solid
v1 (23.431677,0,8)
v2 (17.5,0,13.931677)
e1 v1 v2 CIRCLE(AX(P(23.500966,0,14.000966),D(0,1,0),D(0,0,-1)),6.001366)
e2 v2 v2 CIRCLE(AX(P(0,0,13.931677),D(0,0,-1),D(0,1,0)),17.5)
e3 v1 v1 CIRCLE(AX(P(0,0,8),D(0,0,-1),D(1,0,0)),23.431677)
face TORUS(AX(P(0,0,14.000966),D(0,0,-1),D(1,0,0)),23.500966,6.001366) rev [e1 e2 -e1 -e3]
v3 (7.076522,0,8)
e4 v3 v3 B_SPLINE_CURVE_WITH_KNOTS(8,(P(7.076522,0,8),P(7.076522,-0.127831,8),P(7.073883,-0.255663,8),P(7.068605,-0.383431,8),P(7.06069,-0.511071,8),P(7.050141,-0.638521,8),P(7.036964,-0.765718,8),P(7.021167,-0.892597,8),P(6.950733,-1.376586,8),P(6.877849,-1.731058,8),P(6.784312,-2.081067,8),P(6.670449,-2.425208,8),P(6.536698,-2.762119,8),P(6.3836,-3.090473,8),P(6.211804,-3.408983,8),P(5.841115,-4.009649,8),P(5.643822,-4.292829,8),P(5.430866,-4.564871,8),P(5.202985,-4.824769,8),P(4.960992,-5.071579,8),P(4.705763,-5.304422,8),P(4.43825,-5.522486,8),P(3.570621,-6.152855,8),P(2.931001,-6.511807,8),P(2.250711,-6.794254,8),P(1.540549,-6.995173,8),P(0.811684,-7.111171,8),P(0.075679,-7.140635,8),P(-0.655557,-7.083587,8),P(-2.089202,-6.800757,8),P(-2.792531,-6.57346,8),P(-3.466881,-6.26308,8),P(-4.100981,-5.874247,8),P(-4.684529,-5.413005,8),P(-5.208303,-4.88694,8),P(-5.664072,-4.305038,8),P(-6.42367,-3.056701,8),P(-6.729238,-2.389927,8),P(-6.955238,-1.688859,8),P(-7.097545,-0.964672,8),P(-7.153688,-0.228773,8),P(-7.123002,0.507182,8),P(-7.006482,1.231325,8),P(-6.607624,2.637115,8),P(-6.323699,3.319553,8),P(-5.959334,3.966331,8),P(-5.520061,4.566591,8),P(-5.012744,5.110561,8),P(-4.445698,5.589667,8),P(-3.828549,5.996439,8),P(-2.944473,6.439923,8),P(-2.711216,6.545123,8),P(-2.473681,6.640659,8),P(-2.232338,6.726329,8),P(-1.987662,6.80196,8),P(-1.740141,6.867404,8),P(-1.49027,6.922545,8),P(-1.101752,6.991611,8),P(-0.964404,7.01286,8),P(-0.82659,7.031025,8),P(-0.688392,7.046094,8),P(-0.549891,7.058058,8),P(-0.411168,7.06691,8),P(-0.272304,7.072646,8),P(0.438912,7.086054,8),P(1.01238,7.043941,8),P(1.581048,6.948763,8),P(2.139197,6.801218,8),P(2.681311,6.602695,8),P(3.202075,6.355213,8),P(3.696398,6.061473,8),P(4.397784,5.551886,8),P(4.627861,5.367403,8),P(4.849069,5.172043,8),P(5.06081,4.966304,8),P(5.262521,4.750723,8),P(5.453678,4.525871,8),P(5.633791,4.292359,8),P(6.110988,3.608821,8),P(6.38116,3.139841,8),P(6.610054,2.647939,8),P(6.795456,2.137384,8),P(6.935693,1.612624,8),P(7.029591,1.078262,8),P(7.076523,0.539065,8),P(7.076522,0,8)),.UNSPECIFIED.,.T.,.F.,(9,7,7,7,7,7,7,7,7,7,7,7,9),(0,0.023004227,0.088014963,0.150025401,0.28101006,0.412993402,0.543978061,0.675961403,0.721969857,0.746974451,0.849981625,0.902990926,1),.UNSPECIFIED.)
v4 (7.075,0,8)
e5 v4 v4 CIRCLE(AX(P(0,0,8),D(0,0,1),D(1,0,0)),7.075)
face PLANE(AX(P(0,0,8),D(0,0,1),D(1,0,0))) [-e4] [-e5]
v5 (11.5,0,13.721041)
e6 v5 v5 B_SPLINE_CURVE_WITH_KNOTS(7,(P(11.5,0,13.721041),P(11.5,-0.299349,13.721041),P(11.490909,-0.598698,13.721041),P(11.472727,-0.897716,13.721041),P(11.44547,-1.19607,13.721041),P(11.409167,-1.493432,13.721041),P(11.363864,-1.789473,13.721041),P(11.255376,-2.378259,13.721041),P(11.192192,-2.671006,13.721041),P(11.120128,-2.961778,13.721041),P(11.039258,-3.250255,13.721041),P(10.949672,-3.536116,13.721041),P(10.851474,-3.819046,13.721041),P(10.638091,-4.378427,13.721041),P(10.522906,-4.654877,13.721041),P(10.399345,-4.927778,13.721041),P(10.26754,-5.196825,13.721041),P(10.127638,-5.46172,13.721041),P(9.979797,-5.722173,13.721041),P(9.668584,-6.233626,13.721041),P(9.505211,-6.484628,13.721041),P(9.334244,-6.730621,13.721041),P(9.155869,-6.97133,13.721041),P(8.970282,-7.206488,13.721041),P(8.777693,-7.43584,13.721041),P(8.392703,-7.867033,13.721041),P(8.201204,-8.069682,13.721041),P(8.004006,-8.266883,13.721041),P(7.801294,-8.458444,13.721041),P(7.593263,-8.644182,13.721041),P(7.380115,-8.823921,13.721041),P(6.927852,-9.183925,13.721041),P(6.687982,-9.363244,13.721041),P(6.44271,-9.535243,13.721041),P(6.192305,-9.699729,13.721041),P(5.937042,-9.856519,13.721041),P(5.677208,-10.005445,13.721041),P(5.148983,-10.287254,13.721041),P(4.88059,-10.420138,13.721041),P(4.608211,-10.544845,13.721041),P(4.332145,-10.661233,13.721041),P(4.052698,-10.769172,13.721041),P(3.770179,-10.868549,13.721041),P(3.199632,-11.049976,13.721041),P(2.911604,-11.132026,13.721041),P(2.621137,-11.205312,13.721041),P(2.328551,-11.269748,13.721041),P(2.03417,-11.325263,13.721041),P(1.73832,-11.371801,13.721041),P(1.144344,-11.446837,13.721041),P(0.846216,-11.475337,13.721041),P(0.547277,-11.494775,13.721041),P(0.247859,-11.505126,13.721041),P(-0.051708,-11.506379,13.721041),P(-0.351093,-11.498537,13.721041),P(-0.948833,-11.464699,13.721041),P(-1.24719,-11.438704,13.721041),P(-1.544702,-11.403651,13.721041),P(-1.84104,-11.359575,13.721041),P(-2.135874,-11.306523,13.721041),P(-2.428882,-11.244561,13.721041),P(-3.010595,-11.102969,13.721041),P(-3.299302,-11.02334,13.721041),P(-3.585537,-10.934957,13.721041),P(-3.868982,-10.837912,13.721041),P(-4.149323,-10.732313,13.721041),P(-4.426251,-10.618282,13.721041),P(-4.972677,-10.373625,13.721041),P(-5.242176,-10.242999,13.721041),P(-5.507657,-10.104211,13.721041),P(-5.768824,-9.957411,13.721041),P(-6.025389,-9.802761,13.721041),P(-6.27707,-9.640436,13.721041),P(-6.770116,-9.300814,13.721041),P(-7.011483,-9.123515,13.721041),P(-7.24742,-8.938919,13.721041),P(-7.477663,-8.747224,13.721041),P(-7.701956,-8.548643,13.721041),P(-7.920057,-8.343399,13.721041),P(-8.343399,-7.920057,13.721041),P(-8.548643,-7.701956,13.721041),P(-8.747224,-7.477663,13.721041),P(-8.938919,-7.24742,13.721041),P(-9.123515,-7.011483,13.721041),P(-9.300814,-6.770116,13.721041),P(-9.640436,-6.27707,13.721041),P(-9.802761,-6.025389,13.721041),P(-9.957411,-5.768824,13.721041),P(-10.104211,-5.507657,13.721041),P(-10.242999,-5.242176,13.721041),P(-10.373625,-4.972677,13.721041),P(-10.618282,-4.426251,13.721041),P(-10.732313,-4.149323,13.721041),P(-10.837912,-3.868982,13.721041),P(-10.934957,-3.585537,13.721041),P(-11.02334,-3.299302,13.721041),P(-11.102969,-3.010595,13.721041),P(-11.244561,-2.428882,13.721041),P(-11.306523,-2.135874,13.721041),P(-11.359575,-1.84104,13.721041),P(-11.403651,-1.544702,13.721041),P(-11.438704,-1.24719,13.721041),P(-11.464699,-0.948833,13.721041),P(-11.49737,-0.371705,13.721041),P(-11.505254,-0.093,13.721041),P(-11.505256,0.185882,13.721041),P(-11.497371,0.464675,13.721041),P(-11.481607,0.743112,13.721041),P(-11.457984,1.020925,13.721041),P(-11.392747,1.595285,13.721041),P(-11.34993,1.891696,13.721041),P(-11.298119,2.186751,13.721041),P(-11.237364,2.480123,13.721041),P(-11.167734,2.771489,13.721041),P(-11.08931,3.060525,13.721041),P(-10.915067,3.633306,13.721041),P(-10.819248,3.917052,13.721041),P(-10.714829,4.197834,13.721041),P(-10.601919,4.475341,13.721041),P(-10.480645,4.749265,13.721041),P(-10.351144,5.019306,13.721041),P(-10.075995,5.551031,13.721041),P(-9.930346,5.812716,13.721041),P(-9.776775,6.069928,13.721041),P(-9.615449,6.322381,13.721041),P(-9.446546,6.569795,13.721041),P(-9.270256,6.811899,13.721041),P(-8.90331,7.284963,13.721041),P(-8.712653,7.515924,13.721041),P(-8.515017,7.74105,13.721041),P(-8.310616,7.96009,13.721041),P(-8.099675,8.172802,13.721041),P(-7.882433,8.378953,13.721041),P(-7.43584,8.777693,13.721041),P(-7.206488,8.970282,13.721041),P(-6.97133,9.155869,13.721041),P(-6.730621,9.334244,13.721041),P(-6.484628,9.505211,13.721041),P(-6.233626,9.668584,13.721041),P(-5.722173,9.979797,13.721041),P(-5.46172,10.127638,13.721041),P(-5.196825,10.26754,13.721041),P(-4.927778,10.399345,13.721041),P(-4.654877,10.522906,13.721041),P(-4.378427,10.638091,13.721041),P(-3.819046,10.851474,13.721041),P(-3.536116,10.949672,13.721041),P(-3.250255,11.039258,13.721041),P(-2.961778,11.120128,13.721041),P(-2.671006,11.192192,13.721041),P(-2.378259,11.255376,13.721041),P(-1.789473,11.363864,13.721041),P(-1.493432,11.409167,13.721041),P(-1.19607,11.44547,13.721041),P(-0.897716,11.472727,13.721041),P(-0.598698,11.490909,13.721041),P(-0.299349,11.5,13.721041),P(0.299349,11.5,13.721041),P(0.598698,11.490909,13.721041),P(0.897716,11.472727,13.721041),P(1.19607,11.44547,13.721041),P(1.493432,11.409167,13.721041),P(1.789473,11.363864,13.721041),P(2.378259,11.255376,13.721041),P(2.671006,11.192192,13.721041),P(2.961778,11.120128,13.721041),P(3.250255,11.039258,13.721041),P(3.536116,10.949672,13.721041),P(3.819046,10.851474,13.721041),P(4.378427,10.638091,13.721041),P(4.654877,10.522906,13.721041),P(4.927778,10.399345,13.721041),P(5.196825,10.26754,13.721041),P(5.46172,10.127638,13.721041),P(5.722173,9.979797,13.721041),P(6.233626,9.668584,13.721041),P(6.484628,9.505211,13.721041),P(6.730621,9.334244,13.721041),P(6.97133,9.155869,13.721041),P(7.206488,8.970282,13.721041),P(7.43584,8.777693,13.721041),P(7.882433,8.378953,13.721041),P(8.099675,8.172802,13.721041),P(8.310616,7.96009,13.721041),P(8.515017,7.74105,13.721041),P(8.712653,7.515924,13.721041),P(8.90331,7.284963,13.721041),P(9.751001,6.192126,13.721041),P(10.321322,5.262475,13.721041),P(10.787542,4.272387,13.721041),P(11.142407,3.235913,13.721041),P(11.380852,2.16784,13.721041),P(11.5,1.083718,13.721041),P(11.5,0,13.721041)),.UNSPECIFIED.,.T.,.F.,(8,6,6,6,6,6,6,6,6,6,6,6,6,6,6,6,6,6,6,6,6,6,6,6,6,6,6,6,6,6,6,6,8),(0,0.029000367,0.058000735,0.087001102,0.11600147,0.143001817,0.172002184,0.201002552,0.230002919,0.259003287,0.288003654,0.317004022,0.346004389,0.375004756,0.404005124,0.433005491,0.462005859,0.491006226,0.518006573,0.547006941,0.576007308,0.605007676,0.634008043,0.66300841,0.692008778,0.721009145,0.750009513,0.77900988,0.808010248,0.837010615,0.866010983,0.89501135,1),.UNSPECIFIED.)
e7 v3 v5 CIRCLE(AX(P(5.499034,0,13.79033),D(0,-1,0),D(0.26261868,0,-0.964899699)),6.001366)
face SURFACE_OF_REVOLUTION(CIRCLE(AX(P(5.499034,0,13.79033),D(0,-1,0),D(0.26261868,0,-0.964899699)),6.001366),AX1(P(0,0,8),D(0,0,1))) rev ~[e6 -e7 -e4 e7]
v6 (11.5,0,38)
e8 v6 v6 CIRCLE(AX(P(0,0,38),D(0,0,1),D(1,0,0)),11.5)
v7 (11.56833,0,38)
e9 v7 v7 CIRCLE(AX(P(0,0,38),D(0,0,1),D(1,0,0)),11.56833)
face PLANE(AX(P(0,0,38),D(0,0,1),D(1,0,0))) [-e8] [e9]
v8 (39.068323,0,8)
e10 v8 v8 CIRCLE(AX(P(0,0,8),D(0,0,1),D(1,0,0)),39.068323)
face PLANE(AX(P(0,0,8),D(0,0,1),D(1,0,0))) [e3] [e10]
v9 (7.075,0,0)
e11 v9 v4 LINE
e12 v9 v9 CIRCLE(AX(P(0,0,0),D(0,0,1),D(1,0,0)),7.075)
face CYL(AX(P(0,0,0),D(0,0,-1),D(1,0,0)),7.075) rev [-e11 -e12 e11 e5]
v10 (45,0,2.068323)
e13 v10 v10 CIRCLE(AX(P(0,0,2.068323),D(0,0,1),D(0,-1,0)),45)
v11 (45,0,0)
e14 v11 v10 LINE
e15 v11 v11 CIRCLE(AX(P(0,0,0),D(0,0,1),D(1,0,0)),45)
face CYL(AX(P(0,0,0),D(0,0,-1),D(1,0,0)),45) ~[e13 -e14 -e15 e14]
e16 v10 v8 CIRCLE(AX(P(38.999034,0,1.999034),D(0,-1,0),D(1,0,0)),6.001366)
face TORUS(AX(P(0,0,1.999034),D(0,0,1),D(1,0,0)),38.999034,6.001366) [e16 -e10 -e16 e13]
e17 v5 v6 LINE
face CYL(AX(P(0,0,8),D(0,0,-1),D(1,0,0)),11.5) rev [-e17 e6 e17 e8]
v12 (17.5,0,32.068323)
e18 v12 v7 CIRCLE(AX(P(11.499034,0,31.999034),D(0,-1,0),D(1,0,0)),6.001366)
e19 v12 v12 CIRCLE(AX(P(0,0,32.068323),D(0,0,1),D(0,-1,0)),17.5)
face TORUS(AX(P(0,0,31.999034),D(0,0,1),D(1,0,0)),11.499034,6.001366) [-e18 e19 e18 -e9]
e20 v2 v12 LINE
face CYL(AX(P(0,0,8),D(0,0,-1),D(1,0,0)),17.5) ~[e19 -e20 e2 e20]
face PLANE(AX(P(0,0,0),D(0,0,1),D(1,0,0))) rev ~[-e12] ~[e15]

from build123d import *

# Parameters (mm, degrees)
F0_R     = 45
F0_R_2   = 7.075
F1_DEPTH = 8
F2_R     = 17.5
F2_R_2   = 11.5
F3_DEPTH = 30


# Not quite as in the source:
# - a fillet or chamfer that OpenCascade refuses, or shapes differently, is made with other operations: its cross-section is extruded or revolved along the edge and cut away or added


with BuildPart() as f1:
    # F0 (on Top) → F1 (new body)
    with BuildSketch(Plane.XY):
        Circle(F0_R)
        Circle(F0_R_2, mode=Mode.SUBTRACT)
    extrude(amount=F1_DEPTH)

    # F2 (on face) → F3 (join)
    with BuildSketch(Plane.XY.offset(8)):
        Circle(F2_R)
        Circle(F2_R_2, mode=Mode.SUBTRACT)
    extrude(amount=F3_DEPTH)

    # F4: fillet of radius 6 on 4 edges, made by hand

    # F4_s1 → F4_t2 (revolve)
    with BuildSketch(Plane.XZ):
        with BuildLine():
            ThreePointArc((23.5009656854, 7.9996), (19.2573593129, 9.7573593129), (17.4996, 14.0009656854))
            Line((17.4996, 14.0009656854), (16.8994634315, 14.0009656854))
            ThreePointArc((16.8994634315, 14.0009656854), (16.8998634315, 11.0004828427), (16.8998634315, 8))
            Line((16.8998634315, 8), (17.5, 7.3998634315))
            ThreePointArc((17.5, 7.3998634315), (20.5004828427, 7.3998634315), (23.5009656854, 7.3994634315))
            Line((23.5009656854, 7.3994634315), (23.5009656854, 7.9996))
        make_face()
    revolve(axis=Axis((0, 0, 8), (0, 0, 1)))

    # F4_s3 → F4_t4 (revolve)
    with BuildSketch(Plane.XZ):
        with BuildLine():
            ThreePointArc((7.0751050475, 7.9996140401), (10.2674180504, 10.1463065699), (11.5004, 13.7903299833))
            Line((11.5004, 13.7903299833), (12.1005365685, 13.7903299833))
            ThreePointArc((12.1005365685, 13.7903299833), (12.1001365685, 10.8951649917), (12.1001365685, 8))
            Line((12.1001365685, 8), (11.5, 7.3998634315))
            ThreePointArc((11.5, 7.3998634315), (9.2875525237, 7.3998634315), (7.2327121208, 7.4205424458))
            Line((7.2327121208, 7.4205424458), (7.0751050475, 7.9996140401))
        make_face()
    revolve(axis=Axis((0, 0, 8), (0, 0, 1)))

    # F4_s5 → F4_t6 (revolve, cut)
    with BuildSketch(Plane.XZ):
        with BuildLine():
            ThreePointArc((45.0004, 1.9990343146), (43.2426406871, 6.2426406871), (38.9990343146, 8.0004))
            Line((38.9990343146, 8.0004), (38.9990343146, 8.6005365685))
            ThreePointArc((38.9990343146, 8.6005365685), (41.9995171573, 8.6001365685), (45, 8.6001365685))
            Line((45, 8.6001365685), (45.6001365685, 8))
            ThreePointArc((45.6001365685, 8), (45.6001365685, 4.9995171573), (45.6005365685, 1.9990343146))
            Line((45.6005365685, 1.9990343146), (45.0004, 1.9990343146))
        make_face()
    revolve(axis=Axis((0, 0, 8), (0, 0, 1)), mode=Mode.SUBTRACT)

    # F4_s7 → F4_t8 (revolve, cut)
    with BuildSketch(Plane.XZ):
        with BuildLine():
            ThreePointArc((17.5004, 31.9990343923), (15.7429821175, 36.242299307), (11.5000000644, 38.0004))
            Line((11.5000000644, 38.0004), (11.5000966393, 38.6005365608))
            ThreePointArc((11.5000966393, 38.6005365608), (14.5000000322, 38.6001365685), (17.5, 38.6001365685))
            Line((17.5, 38.6001365685), (18.1001365685, 38))
            ThreePointArc((18.1001365685, 38), (18.1001365685, 34.9995171961), (18.1005365685, 31.9990343923))
            Line((18.1005365685, 31.9990343923), (17.5004, 31.9990343923))
        make_face()
    revolve(axis=Axis((0, 0, 38), (0, 0, 1)), mode=Mode.SUBTRACT)


solid = f1.part
